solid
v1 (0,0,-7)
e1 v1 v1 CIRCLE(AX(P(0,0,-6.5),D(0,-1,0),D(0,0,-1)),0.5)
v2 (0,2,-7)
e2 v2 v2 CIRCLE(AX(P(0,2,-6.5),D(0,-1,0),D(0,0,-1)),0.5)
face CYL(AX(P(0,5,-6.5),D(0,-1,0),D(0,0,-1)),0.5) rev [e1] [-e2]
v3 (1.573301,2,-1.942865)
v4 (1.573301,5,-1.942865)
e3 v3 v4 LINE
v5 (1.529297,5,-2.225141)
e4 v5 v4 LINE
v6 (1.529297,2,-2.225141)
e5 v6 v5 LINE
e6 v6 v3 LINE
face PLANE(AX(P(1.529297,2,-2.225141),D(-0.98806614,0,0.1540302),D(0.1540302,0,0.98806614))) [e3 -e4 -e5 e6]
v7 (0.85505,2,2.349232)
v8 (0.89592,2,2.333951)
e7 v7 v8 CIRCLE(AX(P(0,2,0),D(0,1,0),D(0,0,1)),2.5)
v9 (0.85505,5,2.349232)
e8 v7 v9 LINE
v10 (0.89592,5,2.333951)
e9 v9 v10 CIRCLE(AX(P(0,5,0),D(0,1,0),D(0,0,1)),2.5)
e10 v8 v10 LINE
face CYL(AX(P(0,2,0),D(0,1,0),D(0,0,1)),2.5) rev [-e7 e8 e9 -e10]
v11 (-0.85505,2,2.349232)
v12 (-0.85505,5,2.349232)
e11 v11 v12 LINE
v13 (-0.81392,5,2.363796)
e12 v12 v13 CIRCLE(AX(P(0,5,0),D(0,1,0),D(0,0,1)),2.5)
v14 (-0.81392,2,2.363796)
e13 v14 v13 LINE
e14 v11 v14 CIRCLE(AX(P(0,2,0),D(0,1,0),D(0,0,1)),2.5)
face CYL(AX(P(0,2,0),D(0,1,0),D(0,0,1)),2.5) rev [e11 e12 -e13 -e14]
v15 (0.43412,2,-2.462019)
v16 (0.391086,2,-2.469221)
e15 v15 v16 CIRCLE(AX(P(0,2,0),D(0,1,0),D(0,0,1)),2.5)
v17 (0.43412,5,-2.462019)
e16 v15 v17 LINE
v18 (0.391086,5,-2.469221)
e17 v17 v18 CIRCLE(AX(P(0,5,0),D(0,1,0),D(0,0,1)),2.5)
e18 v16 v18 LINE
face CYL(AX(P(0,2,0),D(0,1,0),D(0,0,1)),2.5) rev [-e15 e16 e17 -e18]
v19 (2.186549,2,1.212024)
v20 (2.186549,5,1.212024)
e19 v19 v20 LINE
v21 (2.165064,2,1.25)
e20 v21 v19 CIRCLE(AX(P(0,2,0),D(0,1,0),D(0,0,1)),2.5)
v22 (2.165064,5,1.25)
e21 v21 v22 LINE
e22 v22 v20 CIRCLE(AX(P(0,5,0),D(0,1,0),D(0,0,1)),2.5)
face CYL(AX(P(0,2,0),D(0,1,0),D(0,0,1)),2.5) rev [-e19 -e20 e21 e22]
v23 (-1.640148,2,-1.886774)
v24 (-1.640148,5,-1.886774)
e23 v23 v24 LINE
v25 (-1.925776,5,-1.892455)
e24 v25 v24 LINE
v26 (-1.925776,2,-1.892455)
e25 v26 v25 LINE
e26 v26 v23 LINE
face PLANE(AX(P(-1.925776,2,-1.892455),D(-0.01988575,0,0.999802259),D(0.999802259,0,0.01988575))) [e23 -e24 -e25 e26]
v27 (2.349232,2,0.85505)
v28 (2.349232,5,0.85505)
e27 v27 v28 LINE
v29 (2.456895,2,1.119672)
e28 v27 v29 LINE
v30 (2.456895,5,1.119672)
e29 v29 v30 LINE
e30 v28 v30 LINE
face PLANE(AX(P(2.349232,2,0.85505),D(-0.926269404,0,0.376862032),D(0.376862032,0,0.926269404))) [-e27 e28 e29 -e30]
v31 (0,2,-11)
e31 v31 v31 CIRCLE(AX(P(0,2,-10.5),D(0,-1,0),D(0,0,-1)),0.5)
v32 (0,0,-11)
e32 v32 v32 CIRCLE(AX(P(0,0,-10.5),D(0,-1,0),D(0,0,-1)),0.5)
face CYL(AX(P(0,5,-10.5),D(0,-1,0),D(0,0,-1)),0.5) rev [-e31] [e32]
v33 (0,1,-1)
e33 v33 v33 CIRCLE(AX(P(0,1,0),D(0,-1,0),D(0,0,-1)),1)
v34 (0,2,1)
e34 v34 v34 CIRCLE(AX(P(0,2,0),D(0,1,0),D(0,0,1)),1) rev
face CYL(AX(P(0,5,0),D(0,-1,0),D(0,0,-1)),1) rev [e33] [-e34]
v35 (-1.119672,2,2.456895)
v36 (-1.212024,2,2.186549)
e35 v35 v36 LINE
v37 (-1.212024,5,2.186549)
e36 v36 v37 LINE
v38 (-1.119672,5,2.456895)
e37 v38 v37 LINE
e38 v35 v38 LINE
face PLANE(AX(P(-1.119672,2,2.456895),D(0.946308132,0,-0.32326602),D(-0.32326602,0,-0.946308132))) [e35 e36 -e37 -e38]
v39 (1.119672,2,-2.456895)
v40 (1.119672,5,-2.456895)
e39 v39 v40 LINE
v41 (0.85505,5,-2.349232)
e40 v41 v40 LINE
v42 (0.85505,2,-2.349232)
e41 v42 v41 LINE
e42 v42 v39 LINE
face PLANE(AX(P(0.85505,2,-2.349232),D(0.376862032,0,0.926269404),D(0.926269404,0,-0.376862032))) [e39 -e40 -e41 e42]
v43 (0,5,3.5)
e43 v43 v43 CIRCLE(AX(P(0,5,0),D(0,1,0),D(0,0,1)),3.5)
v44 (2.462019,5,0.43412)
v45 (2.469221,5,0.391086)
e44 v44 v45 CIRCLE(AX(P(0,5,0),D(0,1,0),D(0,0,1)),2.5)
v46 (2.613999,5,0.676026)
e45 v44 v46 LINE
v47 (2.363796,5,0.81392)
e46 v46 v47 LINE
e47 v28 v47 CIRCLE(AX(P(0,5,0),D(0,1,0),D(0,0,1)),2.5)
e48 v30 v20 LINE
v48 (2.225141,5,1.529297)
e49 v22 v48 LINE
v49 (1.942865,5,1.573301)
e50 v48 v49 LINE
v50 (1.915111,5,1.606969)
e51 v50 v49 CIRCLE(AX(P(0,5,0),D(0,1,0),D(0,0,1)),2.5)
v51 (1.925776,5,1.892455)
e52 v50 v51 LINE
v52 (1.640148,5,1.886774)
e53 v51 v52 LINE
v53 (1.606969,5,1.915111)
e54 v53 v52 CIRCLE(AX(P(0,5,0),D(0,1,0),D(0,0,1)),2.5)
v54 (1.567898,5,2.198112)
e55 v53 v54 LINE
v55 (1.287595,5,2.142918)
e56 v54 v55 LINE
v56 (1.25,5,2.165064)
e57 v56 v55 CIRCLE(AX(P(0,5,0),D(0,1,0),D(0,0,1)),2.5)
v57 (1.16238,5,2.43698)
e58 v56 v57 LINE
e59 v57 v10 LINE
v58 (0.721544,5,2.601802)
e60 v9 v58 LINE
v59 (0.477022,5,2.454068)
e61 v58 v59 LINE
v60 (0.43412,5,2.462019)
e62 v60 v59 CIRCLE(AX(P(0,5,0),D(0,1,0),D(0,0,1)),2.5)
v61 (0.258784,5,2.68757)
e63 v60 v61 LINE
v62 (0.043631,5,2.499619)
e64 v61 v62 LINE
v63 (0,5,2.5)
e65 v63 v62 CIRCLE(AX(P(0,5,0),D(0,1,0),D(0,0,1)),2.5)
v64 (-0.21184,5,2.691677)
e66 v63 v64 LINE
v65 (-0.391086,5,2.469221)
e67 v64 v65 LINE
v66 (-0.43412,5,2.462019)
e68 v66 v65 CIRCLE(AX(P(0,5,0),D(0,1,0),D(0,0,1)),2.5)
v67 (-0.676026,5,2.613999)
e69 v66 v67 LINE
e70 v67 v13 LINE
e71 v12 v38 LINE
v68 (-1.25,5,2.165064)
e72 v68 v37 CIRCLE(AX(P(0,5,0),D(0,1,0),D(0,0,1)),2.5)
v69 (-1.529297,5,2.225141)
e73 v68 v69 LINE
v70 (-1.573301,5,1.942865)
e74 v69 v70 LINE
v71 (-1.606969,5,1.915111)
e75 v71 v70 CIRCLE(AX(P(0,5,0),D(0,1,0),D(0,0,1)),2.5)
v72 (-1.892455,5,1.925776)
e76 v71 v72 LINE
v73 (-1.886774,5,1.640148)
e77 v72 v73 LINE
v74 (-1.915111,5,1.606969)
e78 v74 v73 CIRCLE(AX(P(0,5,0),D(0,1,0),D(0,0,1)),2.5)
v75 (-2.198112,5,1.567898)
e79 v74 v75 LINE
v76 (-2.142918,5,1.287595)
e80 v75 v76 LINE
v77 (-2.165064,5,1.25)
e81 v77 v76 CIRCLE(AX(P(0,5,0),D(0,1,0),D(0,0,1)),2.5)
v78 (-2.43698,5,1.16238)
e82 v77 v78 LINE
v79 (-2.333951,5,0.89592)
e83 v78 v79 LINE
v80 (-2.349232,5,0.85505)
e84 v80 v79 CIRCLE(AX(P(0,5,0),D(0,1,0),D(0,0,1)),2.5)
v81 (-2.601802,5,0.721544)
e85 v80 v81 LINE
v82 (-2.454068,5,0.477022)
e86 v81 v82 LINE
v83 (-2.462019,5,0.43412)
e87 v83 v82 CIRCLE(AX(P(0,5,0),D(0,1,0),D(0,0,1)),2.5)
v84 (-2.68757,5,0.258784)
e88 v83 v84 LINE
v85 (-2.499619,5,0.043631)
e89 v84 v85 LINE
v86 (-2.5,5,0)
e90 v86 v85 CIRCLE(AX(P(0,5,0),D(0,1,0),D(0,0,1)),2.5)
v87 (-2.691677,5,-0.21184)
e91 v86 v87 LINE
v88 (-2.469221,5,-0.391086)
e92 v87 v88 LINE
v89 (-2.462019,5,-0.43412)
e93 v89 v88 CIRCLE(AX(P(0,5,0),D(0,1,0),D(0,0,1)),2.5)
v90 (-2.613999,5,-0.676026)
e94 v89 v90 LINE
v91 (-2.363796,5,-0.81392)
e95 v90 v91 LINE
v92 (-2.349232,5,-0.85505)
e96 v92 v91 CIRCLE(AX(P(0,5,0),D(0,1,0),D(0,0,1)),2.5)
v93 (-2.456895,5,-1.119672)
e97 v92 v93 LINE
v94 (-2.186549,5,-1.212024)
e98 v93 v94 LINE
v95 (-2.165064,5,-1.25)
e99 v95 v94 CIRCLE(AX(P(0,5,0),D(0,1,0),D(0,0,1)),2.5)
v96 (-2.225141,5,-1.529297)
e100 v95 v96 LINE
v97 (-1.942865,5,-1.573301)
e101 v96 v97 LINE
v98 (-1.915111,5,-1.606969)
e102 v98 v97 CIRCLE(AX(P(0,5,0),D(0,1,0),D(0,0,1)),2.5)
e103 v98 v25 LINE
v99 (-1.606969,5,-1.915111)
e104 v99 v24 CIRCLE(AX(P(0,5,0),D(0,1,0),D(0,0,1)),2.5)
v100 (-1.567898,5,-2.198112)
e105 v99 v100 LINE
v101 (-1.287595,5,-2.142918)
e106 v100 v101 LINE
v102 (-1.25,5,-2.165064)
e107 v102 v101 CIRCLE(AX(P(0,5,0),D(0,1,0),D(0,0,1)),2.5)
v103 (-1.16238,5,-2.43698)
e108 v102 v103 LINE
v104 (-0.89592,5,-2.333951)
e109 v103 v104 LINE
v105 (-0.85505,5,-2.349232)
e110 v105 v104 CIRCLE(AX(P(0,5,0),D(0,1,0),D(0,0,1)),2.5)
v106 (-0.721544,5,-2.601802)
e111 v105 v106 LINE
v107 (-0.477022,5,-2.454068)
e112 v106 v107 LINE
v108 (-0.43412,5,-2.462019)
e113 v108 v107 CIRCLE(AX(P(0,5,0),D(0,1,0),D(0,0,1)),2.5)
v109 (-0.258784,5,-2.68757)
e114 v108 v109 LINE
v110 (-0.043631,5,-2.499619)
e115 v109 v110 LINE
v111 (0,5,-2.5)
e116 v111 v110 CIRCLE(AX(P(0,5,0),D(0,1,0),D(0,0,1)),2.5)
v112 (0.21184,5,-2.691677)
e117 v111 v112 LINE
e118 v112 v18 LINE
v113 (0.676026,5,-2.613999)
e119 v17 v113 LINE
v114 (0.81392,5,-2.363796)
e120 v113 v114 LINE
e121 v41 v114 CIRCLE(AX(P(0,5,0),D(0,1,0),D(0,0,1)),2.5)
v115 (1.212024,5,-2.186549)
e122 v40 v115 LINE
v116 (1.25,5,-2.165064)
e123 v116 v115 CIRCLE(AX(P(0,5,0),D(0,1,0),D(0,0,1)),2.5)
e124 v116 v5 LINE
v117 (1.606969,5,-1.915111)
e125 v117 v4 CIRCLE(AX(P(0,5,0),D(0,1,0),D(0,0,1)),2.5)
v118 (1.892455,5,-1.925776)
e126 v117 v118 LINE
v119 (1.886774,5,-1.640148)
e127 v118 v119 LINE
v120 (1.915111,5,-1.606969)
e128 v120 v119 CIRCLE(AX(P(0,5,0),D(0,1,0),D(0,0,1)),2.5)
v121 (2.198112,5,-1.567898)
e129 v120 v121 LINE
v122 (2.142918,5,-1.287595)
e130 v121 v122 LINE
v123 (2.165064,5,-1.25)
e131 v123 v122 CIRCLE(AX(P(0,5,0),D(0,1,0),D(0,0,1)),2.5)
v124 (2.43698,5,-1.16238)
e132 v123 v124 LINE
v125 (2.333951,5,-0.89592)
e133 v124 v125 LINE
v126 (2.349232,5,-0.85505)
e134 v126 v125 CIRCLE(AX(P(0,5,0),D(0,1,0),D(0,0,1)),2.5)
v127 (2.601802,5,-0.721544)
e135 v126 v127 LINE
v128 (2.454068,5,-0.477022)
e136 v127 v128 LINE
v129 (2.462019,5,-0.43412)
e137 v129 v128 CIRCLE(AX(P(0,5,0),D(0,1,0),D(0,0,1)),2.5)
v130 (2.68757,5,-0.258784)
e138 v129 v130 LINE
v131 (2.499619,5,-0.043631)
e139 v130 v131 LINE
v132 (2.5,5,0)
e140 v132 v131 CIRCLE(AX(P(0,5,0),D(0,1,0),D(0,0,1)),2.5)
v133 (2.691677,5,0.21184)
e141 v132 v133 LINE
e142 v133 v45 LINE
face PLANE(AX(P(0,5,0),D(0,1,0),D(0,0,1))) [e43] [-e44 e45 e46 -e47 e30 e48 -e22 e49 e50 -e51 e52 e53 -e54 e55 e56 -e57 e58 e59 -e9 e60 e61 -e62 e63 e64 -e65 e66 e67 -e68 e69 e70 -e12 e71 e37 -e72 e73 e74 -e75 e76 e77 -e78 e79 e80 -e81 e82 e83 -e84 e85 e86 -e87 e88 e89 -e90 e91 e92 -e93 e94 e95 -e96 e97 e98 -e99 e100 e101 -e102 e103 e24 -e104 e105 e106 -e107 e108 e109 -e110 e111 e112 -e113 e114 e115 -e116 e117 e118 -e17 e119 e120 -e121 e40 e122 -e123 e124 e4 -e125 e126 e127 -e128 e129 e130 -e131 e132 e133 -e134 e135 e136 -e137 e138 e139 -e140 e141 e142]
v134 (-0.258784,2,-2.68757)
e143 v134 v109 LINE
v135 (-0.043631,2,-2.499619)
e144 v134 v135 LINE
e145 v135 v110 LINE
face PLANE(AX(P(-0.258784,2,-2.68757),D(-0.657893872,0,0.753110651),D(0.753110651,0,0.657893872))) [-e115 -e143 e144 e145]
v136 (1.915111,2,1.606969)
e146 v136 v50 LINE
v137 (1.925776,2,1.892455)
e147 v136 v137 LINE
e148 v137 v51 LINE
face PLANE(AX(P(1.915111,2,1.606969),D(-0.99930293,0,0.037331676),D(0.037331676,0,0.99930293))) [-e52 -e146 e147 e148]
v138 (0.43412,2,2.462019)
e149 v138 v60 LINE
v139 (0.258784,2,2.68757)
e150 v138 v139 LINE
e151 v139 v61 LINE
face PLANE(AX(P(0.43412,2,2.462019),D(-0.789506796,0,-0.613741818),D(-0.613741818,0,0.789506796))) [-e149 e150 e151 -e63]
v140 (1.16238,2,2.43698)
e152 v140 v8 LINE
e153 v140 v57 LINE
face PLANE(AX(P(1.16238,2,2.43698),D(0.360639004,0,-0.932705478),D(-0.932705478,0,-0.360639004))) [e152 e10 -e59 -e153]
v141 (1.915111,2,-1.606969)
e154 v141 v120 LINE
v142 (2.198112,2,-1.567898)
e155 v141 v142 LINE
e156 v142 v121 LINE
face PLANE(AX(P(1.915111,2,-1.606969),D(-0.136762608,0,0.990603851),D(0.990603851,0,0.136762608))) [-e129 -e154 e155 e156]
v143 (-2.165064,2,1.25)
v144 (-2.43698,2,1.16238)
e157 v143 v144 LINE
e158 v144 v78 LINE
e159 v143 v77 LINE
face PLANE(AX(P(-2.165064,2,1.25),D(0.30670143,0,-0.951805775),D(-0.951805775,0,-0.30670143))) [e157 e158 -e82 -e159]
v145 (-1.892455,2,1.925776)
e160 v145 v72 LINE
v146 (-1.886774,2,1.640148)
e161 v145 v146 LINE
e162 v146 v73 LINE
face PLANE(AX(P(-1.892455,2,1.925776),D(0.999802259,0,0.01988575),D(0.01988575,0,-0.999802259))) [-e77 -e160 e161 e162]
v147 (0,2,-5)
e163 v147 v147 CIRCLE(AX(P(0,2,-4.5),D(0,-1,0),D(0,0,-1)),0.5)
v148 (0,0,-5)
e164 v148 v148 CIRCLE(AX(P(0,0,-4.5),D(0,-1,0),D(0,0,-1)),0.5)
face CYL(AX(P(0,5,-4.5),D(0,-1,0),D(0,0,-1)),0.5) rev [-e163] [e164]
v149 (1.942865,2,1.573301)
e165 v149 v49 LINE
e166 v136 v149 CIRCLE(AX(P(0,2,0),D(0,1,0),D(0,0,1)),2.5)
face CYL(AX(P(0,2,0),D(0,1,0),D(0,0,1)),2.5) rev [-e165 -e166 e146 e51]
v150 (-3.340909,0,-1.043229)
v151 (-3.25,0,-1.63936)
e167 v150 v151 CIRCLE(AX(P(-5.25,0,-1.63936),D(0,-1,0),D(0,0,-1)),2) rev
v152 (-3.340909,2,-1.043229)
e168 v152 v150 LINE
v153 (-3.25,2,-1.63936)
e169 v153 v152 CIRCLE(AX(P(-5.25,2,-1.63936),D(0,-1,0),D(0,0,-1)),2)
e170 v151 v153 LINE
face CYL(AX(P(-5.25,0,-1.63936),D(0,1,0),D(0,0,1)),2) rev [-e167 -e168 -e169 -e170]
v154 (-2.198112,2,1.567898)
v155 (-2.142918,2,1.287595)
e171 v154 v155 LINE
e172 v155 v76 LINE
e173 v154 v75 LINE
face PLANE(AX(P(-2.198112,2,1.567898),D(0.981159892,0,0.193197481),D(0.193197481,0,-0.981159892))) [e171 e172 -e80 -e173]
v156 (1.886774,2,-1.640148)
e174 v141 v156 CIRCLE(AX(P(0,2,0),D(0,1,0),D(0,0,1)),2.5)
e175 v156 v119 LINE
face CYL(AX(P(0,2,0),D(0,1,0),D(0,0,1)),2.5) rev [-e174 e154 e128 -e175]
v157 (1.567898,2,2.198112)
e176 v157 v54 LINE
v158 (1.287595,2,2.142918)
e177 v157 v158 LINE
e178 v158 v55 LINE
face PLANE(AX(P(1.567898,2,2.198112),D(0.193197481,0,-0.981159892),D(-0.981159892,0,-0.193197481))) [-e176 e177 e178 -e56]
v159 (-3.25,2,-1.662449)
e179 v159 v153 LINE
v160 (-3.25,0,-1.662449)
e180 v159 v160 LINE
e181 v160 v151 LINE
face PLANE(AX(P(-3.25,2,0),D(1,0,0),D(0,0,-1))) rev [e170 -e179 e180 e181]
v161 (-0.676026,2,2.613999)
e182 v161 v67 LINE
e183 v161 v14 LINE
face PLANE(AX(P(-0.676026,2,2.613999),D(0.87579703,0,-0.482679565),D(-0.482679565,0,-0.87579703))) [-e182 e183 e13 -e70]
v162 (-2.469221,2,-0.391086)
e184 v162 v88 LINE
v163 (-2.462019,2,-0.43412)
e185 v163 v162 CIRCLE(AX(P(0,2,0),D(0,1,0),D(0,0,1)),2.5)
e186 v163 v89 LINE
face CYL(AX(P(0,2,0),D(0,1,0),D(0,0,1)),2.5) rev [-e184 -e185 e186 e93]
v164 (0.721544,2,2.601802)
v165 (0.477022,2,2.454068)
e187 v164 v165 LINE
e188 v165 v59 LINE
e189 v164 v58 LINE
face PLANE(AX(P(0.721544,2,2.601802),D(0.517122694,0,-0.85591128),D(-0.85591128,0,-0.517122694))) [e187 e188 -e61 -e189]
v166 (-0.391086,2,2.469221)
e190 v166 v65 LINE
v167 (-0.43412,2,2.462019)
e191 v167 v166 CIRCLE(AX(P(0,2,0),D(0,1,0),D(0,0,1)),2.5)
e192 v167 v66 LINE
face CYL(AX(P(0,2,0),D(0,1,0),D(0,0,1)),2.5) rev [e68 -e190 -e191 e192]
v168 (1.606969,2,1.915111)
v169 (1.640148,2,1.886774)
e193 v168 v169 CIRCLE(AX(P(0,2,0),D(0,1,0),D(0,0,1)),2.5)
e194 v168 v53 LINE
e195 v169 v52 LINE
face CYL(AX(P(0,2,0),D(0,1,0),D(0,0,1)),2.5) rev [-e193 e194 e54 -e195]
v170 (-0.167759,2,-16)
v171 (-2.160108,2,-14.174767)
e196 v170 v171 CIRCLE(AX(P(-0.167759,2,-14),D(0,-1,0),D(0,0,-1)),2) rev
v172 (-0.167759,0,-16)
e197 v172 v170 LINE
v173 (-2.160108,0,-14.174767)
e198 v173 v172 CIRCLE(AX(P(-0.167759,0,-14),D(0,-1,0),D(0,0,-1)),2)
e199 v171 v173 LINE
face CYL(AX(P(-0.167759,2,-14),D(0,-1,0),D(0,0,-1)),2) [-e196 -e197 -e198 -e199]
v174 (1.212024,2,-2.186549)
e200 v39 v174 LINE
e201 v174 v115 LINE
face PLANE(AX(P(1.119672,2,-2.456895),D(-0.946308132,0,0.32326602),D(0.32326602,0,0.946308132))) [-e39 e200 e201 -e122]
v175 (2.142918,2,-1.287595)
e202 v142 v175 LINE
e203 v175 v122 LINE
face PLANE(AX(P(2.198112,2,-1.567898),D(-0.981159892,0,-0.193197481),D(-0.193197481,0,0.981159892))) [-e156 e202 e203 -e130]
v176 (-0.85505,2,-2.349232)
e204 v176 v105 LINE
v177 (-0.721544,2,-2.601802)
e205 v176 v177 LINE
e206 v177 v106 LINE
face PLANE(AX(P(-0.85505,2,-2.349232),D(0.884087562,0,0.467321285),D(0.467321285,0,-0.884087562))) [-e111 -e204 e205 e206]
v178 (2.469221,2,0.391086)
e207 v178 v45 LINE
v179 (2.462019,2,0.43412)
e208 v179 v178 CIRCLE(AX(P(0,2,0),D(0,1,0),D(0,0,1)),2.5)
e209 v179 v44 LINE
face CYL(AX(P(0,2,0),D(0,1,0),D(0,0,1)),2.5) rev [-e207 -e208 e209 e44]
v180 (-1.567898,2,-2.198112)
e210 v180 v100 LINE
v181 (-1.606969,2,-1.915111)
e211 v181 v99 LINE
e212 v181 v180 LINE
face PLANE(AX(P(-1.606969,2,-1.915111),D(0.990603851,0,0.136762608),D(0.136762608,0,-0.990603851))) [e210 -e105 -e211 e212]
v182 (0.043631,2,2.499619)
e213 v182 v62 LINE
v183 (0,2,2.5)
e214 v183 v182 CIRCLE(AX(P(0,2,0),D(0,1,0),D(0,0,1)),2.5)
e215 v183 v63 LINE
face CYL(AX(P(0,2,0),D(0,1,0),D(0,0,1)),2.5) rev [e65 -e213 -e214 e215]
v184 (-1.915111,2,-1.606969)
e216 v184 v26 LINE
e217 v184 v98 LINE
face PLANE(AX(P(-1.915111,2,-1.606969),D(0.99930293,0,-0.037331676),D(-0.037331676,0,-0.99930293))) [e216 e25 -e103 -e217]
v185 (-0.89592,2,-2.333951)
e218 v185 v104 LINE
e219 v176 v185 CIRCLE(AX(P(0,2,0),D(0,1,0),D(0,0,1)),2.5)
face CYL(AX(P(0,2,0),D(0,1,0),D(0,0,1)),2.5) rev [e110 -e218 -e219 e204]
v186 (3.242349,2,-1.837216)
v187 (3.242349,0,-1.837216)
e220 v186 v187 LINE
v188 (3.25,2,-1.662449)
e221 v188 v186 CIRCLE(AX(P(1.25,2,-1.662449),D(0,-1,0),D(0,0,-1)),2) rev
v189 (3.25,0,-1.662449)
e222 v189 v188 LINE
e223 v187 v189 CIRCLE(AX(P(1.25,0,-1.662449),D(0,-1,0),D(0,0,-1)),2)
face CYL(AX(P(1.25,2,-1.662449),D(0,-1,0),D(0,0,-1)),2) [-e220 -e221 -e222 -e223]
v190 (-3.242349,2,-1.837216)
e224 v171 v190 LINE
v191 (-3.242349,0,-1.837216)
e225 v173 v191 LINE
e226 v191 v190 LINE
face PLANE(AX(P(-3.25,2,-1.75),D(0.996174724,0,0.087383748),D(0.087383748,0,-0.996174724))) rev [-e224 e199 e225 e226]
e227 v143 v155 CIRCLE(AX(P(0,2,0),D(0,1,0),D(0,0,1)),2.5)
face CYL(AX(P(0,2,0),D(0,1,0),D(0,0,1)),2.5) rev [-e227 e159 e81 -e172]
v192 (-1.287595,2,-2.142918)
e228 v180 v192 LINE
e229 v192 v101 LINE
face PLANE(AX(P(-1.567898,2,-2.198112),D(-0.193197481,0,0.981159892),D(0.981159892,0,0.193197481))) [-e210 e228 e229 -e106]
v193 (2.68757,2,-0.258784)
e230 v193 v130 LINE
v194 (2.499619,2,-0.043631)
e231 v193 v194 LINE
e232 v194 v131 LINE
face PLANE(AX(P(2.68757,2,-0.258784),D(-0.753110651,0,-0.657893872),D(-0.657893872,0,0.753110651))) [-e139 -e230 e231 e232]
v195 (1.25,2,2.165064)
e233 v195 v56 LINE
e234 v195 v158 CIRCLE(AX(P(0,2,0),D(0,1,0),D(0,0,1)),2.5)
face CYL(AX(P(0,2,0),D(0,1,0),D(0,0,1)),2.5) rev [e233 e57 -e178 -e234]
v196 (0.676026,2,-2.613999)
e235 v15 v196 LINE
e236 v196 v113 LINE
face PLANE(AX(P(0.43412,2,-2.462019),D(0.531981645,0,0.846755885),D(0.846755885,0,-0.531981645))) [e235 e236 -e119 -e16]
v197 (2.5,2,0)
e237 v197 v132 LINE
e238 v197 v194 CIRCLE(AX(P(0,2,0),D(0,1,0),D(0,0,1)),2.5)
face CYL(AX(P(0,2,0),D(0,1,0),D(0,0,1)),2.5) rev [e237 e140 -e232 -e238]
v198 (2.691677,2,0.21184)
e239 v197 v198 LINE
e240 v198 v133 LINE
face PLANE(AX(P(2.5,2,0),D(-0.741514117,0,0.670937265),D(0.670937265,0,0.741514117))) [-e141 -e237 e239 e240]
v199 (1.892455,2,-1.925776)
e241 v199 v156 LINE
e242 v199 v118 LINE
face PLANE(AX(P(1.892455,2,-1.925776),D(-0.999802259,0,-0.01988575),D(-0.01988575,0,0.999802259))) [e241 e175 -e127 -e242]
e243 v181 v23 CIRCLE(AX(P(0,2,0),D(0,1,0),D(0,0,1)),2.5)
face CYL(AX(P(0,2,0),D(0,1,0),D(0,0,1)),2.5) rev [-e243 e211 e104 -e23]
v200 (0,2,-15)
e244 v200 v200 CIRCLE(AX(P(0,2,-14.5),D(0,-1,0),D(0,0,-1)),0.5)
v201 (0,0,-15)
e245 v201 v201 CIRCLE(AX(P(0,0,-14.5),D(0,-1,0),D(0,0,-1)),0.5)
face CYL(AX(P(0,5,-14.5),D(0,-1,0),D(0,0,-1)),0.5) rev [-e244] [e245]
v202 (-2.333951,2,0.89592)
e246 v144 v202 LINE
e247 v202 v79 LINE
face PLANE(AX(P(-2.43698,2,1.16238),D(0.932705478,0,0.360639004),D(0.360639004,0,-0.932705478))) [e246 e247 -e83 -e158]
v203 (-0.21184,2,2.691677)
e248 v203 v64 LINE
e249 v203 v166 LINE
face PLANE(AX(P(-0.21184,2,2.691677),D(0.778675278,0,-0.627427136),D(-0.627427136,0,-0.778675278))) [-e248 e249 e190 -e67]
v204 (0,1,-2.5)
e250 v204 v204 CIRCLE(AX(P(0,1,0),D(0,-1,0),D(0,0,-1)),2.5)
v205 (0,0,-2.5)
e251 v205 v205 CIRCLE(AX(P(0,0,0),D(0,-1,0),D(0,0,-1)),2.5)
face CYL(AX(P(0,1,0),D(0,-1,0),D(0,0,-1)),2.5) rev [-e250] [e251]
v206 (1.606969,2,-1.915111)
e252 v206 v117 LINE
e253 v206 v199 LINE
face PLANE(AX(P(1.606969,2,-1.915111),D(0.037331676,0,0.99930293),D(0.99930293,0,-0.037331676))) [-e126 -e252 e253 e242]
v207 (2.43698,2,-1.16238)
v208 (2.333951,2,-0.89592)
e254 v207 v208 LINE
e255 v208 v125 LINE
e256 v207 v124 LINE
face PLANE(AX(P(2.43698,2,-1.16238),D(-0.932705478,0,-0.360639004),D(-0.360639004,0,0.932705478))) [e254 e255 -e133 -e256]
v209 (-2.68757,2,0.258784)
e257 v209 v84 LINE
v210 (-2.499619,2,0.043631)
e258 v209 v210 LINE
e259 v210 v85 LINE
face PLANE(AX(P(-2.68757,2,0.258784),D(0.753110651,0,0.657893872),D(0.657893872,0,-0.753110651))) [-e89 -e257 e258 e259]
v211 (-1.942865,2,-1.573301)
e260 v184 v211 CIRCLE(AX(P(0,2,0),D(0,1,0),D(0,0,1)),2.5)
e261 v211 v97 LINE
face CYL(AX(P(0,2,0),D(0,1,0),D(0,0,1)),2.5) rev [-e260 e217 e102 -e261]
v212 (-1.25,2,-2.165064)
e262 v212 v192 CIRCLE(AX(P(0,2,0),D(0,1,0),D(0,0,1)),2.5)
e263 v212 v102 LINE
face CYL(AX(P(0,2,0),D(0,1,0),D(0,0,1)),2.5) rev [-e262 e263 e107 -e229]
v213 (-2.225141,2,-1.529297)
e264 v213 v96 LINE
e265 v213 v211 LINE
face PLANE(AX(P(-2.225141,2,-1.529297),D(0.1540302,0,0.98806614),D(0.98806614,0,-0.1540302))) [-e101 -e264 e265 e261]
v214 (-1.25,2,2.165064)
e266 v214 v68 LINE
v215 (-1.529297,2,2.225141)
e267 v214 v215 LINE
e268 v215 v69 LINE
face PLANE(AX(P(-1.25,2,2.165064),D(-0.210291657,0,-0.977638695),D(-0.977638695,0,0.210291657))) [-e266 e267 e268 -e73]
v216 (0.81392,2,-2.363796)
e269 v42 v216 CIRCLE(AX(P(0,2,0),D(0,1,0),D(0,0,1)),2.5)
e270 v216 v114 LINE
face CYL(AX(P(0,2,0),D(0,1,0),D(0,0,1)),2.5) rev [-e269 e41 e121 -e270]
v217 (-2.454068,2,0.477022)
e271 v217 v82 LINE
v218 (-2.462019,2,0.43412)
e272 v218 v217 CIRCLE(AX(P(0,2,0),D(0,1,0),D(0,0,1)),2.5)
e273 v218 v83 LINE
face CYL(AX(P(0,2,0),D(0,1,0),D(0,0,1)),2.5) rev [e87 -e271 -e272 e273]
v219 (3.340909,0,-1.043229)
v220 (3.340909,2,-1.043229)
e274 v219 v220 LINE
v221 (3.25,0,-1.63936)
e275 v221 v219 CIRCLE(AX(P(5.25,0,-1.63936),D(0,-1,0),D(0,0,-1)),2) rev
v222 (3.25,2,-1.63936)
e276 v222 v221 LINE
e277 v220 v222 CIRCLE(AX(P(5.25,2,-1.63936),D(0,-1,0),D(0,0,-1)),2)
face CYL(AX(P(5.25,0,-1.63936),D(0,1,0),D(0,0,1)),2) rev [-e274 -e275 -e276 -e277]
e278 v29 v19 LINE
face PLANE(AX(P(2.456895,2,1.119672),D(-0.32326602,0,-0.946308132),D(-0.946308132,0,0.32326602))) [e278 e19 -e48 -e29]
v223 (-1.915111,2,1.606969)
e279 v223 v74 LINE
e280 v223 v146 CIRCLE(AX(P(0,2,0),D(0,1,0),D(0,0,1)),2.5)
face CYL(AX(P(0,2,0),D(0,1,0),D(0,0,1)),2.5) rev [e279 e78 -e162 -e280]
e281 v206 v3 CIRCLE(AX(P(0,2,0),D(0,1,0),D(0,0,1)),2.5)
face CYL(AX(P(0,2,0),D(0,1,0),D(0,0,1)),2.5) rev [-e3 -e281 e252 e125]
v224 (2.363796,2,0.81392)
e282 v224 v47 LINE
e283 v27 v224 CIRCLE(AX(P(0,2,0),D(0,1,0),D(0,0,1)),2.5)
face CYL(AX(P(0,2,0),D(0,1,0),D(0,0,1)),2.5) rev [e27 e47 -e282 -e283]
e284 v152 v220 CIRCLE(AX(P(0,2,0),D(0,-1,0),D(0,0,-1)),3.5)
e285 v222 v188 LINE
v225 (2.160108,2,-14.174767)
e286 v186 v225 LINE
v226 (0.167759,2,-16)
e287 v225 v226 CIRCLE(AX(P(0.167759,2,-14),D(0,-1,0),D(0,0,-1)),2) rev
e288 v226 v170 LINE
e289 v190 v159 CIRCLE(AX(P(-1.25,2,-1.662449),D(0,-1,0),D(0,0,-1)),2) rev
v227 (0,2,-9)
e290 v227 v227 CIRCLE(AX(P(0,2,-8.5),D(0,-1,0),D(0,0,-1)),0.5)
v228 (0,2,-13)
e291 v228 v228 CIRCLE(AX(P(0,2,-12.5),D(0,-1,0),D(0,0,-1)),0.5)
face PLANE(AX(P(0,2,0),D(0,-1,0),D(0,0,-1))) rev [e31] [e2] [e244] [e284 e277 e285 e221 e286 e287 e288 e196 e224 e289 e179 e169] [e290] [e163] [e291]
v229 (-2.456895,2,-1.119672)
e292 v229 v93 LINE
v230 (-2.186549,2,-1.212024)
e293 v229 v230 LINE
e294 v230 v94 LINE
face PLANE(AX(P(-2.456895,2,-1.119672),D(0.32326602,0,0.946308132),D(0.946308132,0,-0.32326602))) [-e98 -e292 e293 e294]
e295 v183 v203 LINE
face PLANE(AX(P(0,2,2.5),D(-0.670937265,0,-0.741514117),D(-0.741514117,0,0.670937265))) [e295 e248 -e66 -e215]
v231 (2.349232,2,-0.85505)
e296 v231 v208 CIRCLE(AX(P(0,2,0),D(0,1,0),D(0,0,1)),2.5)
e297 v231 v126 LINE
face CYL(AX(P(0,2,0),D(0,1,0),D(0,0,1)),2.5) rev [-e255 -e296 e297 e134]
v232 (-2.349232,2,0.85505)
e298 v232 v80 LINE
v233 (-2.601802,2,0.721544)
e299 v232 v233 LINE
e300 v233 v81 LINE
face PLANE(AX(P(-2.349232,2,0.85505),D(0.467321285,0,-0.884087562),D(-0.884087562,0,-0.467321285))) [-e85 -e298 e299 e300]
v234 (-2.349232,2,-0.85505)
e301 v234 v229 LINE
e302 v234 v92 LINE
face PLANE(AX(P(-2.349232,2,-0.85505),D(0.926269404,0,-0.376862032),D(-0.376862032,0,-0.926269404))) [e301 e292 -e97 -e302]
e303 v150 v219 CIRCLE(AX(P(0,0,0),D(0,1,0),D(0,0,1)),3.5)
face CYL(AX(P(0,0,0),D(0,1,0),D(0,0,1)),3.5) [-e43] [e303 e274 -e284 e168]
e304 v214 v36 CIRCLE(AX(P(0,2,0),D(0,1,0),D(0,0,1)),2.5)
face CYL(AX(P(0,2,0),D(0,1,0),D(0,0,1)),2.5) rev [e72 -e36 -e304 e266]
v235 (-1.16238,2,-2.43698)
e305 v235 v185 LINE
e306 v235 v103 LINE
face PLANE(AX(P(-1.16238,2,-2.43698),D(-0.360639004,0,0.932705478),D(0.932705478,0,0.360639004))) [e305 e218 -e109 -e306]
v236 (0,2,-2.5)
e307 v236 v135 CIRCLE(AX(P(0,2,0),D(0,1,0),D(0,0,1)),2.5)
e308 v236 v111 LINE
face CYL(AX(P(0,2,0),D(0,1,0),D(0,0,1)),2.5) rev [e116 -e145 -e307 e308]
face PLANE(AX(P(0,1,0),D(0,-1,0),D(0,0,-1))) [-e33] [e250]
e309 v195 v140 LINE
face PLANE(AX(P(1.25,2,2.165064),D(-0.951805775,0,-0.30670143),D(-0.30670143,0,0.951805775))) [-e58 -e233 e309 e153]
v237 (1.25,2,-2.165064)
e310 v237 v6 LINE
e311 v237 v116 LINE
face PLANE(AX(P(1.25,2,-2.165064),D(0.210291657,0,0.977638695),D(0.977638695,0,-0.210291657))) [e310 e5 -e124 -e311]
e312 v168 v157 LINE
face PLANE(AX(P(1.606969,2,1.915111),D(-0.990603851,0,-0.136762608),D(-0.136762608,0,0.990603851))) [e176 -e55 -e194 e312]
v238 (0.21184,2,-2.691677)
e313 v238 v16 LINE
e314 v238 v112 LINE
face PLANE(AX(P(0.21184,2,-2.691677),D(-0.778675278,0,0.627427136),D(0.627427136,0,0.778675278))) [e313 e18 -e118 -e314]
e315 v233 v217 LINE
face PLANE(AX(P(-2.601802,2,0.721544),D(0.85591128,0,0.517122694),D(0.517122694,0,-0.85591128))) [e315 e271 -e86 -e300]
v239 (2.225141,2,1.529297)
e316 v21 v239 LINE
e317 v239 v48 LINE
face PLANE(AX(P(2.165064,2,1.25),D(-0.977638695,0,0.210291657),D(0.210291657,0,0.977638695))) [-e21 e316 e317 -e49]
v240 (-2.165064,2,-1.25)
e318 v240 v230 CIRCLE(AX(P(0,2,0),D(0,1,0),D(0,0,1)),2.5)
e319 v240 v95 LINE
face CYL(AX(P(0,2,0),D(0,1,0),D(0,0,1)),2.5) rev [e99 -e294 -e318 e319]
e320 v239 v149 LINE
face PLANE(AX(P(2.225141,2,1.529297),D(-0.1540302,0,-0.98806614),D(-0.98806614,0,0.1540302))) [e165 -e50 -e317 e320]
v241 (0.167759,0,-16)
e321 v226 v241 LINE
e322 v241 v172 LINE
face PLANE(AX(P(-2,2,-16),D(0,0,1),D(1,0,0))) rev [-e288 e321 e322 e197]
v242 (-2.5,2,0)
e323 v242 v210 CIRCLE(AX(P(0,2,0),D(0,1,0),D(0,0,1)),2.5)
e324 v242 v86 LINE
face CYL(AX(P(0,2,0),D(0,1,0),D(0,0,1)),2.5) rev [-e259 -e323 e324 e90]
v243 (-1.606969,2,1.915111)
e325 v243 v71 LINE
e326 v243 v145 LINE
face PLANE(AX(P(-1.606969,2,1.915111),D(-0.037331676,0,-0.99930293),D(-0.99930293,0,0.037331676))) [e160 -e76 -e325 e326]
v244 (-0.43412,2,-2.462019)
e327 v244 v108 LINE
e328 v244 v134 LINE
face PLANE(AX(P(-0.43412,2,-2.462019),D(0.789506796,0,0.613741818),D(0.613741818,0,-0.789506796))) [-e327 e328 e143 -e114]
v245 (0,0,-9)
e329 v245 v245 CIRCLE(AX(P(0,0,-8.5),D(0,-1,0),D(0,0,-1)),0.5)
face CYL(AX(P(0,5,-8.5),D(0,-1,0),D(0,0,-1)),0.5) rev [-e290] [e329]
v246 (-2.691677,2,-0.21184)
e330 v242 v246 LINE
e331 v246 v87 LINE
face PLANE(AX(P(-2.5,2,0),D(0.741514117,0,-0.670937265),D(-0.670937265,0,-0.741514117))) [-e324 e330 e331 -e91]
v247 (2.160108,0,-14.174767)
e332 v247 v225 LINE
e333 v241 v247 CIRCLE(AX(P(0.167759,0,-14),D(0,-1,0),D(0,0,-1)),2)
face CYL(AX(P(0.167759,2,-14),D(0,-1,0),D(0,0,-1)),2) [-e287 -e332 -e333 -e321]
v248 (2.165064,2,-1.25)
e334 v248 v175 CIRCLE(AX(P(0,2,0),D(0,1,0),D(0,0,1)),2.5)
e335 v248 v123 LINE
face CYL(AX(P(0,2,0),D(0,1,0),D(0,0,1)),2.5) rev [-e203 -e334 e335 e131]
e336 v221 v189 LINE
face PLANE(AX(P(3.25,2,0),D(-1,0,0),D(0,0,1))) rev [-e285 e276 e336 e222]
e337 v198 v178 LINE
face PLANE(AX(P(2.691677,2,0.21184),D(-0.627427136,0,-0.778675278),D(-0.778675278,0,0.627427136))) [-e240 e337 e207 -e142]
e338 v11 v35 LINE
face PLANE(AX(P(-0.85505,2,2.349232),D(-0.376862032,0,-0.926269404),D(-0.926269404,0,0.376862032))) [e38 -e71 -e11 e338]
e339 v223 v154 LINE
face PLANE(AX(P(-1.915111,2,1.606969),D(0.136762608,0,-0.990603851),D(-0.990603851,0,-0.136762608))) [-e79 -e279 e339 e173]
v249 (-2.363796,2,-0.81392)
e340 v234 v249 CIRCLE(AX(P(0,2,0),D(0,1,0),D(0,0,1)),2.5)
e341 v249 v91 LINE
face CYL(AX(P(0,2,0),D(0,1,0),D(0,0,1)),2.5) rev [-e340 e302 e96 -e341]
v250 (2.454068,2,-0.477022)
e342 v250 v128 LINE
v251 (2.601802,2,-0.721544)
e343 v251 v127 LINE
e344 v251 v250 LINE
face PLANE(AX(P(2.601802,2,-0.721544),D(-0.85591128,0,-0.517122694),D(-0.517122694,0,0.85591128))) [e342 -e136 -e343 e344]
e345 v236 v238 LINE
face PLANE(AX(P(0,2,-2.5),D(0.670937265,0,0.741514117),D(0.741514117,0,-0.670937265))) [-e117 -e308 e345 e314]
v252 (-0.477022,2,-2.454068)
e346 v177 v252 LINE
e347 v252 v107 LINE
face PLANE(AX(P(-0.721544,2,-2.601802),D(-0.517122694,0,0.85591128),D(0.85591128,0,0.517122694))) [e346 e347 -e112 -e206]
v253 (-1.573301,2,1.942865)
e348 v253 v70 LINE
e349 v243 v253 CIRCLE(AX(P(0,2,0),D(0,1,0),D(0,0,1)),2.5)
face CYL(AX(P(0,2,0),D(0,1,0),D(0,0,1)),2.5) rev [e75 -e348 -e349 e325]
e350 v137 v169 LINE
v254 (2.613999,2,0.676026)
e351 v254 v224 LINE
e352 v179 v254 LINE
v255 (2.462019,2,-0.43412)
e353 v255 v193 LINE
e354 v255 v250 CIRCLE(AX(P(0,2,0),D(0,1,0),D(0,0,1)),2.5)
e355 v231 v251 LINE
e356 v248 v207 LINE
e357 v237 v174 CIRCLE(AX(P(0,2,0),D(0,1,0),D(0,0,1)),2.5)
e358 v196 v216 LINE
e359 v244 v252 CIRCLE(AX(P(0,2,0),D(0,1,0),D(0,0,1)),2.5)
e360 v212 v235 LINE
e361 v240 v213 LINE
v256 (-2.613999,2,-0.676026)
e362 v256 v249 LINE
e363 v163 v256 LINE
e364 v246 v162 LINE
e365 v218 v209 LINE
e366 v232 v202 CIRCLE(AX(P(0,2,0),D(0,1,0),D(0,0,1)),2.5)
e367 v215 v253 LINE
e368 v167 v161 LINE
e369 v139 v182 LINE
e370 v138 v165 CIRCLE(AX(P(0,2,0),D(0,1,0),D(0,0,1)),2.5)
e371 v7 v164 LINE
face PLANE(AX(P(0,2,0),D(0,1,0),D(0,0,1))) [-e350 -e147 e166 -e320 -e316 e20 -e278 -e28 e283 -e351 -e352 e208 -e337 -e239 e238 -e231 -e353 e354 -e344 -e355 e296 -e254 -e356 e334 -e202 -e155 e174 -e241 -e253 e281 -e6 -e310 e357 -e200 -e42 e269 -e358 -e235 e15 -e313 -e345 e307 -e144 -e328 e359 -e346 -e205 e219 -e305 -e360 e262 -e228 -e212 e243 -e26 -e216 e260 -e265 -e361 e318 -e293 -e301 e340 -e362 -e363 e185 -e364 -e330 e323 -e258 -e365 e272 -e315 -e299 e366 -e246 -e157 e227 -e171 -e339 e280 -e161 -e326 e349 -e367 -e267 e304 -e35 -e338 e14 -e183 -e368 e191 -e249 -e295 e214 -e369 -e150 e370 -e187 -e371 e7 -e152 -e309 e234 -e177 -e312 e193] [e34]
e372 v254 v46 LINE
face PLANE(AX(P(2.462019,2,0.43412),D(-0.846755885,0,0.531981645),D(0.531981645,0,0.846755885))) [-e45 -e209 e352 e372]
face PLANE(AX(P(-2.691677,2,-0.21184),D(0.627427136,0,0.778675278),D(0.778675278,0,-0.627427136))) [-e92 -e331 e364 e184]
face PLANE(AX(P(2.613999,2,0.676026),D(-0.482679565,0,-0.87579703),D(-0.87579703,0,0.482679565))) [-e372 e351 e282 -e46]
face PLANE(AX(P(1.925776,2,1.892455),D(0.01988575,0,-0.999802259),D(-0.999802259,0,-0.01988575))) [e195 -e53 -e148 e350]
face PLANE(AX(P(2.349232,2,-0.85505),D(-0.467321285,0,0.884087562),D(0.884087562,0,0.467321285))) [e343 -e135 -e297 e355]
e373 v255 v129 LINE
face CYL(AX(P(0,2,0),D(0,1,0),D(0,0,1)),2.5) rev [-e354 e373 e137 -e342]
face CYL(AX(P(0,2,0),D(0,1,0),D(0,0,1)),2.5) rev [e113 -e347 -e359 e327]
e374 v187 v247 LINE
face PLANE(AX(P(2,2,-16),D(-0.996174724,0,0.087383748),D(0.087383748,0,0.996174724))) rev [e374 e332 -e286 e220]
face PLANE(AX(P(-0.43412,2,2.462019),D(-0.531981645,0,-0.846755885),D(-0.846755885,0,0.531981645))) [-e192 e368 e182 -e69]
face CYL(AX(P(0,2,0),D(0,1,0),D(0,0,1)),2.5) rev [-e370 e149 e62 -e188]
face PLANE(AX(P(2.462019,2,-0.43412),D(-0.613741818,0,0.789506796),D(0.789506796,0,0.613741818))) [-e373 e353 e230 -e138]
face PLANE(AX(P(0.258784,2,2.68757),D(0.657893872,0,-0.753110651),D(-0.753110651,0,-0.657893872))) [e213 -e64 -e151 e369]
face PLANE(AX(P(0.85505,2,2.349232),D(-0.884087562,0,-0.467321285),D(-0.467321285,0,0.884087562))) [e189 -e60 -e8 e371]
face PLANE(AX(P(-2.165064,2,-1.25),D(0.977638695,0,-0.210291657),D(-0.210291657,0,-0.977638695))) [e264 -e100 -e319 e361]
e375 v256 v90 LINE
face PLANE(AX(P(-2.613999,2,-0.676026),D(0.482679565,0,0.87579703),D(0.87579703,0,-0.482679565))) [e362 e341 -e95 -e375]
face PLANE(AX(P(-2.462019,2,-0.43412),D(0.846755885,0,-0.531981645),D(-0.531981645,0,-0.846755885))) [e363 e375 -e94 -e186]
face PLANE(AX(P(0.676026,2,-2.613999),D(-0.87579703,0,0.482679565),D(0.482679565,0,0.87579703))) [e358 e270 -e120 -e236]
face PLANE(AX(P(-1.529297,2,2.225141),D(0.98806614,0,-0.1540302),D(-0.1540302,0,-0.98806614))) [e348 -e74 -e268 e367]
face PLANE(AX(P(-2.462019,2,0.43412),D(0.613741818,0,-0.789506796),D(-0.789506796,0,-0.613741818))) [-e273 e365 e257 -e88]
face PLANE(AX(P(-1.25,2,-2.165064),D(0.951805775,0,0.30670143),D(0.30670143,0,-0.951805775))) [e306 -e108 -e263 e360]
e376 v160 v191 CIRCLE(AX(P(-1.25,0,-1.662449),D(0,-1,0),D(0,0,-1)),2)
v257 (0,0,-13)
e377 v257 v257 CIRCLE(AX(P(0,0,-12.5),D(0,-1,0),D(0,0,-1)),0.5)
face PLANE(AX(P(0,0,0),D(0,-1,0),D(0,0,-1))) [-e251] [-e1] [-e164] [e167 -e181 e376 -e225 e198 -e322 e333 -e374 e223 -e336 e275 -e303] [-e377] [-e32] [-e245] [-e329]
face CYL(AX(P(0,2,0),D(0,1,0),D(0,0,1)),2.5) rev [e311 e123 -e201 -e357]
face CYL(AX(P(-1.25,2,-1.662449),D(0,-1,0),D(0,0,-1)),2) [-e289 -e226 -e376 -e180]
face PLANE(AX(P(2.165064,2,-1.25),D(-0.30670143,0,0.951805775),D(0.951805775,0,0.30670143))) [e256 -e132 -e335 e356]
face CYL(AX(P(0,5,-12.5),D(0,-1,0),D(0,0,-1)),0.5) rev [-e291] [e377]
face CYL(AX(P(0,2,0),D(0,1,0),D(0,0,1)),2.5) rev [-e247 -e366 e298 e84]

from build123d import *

# Parameters (mm, degrees)
BOSS_EXTRUDE1_DEPTH      = 2
FILLET1_R                = 2
BOSS_EXTRUDE2_DEPTH      = 3
BOSS_EXTRUDE2_DEPTH_BACK = 2
SKETCH2_R                = 3.5
SKETCH3_R                = 2.5
CUT_EXTRUDE1_DEPTH       = 1
SKETCH4_R                = 1
CUT_EXTRUDE2_DEPTH       = 17.8597153
CUT_EXTRUDE3_START       = -3
SKETCH5_R                = 2.5
CUT_EXTRUDE3_DEPTH       = 3
CUT_EXTRUDE4_DEPTH       = 3
CIRPATTERN1_COUNT        = 36
SKETCH9_R                = 0.5
CUT_EXTRUDE5_DEPTH       = 18.12454379
LPATTERN1_COUNT          = 6
LPATTERN1_PITCH          = 2
FILLET3_R                = 2


with BuildPart() as part:
    # Sketch1 → Boss-Extrude1 (new body)
    with BuildSketch(Plane(origin=(0, 0, 0), x_dir=(1, 0, 0), z_dir=(0, 1, 0))):
        Polygon((-3.25, 0), (-3.25, 1.75), (-2, 16), (2, 16), (3.25, 1.75), (3.25, 0), align=None)
    extrude(amount=BOSS_EXTRUDE1_DEPTH)

    # Fillet1
    fillet1_edges = [part.edges().sort_by_distance(p)[0] for p in [
        (-2, 1, -16),
        (2, 1, -16),
    ]]
    fillet(fillet1_edges, radius=FILLET1_R)

    # Sketch2 → Boss-Extrude2 (add, two sides: drawn at the far end of the back side and taken through both)
    with BuildSketch(Plane(origin=(0, 2, 0), x_dir=(1, 0, 0), z_dir=(0, 1, 0)).offset(-BOSS_EXTRUDE2_DEPTH_BACK)):
        with Locations(Location((0, 0, 0), (0, 0, 270))):
            Circle(SKETCH2_R)
    extrude(amount=BOSS_EXTRUDE2_DEPTH + BOSS_EXTRUDE2_DEPTH_BACK)

    # Sketch3 → Cut-Extrude1 (cut)
    with BuildSketch(Plane(origin=(0, 0, 0), x_dir=(-1, 0, 0), z_dir=(0, -1, 0))):
        with Locations(Location((0, 0, 0), (0, 0, 90))):
            Circle(SKETCH3_R)
    extrude(amount=-CUT_EXTRUDE1_DEPTH, mode=Mode.SUBTRACT)

    # Sketch4 → Cut-Extrude2 (cut, through all)
    with BuildSketch(Plane(origin=(0, 1, 0), x_dir=(-1, 0, 0), z_dir=(0, -1, 0))):
        with Locations(Location((0, 0, 0), (0, 0, 90))):
            Circle(SKETCH4_R)
    extrude(amount=-CUT_EXTRUDE2_DEPTH, mode=Mode.SUBTRACT)

    # Sketch5 → Cut-Extrude3 (cut)
    with BuildSketch(Plane(origin=(0, 5, 0), x_dir=(1, 0, 0), z_dir=(0, 1, 0)).offset(CUT_EXTRUDE3_START)):
        with Locations(Location((0, 0, 0), (0, 0, 90))):
            Circle(SKETCH5_R)
    extrude(amount=CUT_EXTRUDE3_DEPTH, mode=Mode.SUBTRACT)

    # Sketch6 → Cut-Extrude4 (cut)
    with BuildSketch(Plane(origin=(0, 5, 0), x_dir=(1, 0, 0), z_dir=(0, 1, 0))):
        Polygon((-2.5, 0), (-2.691676801, 0.211839558), (-2.469220851, 0.391086163), align=None)
    cut_extrude4 = extrude(amount=-CUT_EXTRUDE4_DEPTH, mode=Mode.SUBTRACT)

    # CirPattern1: Cut-Extrude4 ×36 about axis
    cirpattern1_axis = Axis((0, 0, 0), (0, 1, 0))
    for i in range(1, CIRPATTERN1_COUNT):
        add(cut_extrude4.rotate(cirpattern1_axis, i * 360 / CIRPATTERN1_COUNT), mode=Mode.SUBTRACT)

    # Sketch9 → Cut-Extrude5 (cut, through all)
    with BuildSketch(Plane(origin=(0, 0, 0), x_dir=(-1, 0, 0), z_dir=(0, -1, 0))):
        with Locations(Location((0, 14.5, 0), (0, 0, 90))):
            Circle(SKETCH9_R)
    cut_extrude5 = extrude(amount=-CUT_EXTRUDE5_DEPTH, mode=Mode.SUBTRACT)

    # LPattern1: Cut-Extrude5 ×6
    with Locations(*[(0, 0, i * LPATTERN1_PITCH) for i in range(1, LPATTERN1_COUNT)]):
        add(cut_extrude5, mode=Mode.SUBTRACT)

    # Fillet3
    # the kernel refuses this fillet: 2 mm, written as the material it adds along each edge
    with BuildSketch(Plane(origin=(-3.25, 0, -1.299038106), x_dir=(0, 0, -1), z_dir=(0, 1, 0))) as fillet3_piece_1:
        with BuildLine():
            CenterArc((0.340321525, 2), FILLET3_R, 252.658557197, 17.341442803)
            ThreePointArc((-0.25580925, 0.090909091), (-0.127022856, 0.047935757), (0, 0))
            Line((0, 0), (0.340321525, 0))
        make_face()
    extrude(amount=2)
    with BuildSketch(Plane(origin=(3.25, 0, -1.299038106), x_dir=(0.3348614999479688, 0, 0.9422673590083636), z_dir=(0, 1, 0))) as fillet3_piece_2:
        with BuildLine():
            CenterArc((0.349049135, 1.998495294), FILLET3_R, 250.435883949, 17.341442803)
            Line((-0.320673865, 0.113960576), (0, 0))
            ThreePointArc((0, 0), (0.13574133, 0.002633235), (0.271482661, 0))
        make_face()
    extrude(amount=2)
    # the kernel refuses this fillet: 2 mm, written as the material it takes off along each edge
    with BuildSketch(Plane(origin=(3.25, -0.218878004, -1.75), x_dir=(0, 0, 1), z_dir=(0, 1, 0)), Plane(origin=(-3.25, -0.218878004, -1.75), x_dir=(0.08738374771484407, 0, -0.9961747239492218), z_dir=(0, 1, 0))) as fillet3_2_piece_1:
        with BuildLine():
            CenterArc((FILLET3_R * 0.043775600736, -FILLET3_R), FILLET3_R, 90, 5.013113755)
            Line((-FILLET3_R * 0.0436081469789, -FILLET3_R * 0.00382527605078), (0, 0))
            Line((0, 0), (FILLET3_R * 0.043775600736, 0))
        make_face()
    extrude(amount=2.437756007, mode=Mode.SUBTRACT)


solid = part.part
